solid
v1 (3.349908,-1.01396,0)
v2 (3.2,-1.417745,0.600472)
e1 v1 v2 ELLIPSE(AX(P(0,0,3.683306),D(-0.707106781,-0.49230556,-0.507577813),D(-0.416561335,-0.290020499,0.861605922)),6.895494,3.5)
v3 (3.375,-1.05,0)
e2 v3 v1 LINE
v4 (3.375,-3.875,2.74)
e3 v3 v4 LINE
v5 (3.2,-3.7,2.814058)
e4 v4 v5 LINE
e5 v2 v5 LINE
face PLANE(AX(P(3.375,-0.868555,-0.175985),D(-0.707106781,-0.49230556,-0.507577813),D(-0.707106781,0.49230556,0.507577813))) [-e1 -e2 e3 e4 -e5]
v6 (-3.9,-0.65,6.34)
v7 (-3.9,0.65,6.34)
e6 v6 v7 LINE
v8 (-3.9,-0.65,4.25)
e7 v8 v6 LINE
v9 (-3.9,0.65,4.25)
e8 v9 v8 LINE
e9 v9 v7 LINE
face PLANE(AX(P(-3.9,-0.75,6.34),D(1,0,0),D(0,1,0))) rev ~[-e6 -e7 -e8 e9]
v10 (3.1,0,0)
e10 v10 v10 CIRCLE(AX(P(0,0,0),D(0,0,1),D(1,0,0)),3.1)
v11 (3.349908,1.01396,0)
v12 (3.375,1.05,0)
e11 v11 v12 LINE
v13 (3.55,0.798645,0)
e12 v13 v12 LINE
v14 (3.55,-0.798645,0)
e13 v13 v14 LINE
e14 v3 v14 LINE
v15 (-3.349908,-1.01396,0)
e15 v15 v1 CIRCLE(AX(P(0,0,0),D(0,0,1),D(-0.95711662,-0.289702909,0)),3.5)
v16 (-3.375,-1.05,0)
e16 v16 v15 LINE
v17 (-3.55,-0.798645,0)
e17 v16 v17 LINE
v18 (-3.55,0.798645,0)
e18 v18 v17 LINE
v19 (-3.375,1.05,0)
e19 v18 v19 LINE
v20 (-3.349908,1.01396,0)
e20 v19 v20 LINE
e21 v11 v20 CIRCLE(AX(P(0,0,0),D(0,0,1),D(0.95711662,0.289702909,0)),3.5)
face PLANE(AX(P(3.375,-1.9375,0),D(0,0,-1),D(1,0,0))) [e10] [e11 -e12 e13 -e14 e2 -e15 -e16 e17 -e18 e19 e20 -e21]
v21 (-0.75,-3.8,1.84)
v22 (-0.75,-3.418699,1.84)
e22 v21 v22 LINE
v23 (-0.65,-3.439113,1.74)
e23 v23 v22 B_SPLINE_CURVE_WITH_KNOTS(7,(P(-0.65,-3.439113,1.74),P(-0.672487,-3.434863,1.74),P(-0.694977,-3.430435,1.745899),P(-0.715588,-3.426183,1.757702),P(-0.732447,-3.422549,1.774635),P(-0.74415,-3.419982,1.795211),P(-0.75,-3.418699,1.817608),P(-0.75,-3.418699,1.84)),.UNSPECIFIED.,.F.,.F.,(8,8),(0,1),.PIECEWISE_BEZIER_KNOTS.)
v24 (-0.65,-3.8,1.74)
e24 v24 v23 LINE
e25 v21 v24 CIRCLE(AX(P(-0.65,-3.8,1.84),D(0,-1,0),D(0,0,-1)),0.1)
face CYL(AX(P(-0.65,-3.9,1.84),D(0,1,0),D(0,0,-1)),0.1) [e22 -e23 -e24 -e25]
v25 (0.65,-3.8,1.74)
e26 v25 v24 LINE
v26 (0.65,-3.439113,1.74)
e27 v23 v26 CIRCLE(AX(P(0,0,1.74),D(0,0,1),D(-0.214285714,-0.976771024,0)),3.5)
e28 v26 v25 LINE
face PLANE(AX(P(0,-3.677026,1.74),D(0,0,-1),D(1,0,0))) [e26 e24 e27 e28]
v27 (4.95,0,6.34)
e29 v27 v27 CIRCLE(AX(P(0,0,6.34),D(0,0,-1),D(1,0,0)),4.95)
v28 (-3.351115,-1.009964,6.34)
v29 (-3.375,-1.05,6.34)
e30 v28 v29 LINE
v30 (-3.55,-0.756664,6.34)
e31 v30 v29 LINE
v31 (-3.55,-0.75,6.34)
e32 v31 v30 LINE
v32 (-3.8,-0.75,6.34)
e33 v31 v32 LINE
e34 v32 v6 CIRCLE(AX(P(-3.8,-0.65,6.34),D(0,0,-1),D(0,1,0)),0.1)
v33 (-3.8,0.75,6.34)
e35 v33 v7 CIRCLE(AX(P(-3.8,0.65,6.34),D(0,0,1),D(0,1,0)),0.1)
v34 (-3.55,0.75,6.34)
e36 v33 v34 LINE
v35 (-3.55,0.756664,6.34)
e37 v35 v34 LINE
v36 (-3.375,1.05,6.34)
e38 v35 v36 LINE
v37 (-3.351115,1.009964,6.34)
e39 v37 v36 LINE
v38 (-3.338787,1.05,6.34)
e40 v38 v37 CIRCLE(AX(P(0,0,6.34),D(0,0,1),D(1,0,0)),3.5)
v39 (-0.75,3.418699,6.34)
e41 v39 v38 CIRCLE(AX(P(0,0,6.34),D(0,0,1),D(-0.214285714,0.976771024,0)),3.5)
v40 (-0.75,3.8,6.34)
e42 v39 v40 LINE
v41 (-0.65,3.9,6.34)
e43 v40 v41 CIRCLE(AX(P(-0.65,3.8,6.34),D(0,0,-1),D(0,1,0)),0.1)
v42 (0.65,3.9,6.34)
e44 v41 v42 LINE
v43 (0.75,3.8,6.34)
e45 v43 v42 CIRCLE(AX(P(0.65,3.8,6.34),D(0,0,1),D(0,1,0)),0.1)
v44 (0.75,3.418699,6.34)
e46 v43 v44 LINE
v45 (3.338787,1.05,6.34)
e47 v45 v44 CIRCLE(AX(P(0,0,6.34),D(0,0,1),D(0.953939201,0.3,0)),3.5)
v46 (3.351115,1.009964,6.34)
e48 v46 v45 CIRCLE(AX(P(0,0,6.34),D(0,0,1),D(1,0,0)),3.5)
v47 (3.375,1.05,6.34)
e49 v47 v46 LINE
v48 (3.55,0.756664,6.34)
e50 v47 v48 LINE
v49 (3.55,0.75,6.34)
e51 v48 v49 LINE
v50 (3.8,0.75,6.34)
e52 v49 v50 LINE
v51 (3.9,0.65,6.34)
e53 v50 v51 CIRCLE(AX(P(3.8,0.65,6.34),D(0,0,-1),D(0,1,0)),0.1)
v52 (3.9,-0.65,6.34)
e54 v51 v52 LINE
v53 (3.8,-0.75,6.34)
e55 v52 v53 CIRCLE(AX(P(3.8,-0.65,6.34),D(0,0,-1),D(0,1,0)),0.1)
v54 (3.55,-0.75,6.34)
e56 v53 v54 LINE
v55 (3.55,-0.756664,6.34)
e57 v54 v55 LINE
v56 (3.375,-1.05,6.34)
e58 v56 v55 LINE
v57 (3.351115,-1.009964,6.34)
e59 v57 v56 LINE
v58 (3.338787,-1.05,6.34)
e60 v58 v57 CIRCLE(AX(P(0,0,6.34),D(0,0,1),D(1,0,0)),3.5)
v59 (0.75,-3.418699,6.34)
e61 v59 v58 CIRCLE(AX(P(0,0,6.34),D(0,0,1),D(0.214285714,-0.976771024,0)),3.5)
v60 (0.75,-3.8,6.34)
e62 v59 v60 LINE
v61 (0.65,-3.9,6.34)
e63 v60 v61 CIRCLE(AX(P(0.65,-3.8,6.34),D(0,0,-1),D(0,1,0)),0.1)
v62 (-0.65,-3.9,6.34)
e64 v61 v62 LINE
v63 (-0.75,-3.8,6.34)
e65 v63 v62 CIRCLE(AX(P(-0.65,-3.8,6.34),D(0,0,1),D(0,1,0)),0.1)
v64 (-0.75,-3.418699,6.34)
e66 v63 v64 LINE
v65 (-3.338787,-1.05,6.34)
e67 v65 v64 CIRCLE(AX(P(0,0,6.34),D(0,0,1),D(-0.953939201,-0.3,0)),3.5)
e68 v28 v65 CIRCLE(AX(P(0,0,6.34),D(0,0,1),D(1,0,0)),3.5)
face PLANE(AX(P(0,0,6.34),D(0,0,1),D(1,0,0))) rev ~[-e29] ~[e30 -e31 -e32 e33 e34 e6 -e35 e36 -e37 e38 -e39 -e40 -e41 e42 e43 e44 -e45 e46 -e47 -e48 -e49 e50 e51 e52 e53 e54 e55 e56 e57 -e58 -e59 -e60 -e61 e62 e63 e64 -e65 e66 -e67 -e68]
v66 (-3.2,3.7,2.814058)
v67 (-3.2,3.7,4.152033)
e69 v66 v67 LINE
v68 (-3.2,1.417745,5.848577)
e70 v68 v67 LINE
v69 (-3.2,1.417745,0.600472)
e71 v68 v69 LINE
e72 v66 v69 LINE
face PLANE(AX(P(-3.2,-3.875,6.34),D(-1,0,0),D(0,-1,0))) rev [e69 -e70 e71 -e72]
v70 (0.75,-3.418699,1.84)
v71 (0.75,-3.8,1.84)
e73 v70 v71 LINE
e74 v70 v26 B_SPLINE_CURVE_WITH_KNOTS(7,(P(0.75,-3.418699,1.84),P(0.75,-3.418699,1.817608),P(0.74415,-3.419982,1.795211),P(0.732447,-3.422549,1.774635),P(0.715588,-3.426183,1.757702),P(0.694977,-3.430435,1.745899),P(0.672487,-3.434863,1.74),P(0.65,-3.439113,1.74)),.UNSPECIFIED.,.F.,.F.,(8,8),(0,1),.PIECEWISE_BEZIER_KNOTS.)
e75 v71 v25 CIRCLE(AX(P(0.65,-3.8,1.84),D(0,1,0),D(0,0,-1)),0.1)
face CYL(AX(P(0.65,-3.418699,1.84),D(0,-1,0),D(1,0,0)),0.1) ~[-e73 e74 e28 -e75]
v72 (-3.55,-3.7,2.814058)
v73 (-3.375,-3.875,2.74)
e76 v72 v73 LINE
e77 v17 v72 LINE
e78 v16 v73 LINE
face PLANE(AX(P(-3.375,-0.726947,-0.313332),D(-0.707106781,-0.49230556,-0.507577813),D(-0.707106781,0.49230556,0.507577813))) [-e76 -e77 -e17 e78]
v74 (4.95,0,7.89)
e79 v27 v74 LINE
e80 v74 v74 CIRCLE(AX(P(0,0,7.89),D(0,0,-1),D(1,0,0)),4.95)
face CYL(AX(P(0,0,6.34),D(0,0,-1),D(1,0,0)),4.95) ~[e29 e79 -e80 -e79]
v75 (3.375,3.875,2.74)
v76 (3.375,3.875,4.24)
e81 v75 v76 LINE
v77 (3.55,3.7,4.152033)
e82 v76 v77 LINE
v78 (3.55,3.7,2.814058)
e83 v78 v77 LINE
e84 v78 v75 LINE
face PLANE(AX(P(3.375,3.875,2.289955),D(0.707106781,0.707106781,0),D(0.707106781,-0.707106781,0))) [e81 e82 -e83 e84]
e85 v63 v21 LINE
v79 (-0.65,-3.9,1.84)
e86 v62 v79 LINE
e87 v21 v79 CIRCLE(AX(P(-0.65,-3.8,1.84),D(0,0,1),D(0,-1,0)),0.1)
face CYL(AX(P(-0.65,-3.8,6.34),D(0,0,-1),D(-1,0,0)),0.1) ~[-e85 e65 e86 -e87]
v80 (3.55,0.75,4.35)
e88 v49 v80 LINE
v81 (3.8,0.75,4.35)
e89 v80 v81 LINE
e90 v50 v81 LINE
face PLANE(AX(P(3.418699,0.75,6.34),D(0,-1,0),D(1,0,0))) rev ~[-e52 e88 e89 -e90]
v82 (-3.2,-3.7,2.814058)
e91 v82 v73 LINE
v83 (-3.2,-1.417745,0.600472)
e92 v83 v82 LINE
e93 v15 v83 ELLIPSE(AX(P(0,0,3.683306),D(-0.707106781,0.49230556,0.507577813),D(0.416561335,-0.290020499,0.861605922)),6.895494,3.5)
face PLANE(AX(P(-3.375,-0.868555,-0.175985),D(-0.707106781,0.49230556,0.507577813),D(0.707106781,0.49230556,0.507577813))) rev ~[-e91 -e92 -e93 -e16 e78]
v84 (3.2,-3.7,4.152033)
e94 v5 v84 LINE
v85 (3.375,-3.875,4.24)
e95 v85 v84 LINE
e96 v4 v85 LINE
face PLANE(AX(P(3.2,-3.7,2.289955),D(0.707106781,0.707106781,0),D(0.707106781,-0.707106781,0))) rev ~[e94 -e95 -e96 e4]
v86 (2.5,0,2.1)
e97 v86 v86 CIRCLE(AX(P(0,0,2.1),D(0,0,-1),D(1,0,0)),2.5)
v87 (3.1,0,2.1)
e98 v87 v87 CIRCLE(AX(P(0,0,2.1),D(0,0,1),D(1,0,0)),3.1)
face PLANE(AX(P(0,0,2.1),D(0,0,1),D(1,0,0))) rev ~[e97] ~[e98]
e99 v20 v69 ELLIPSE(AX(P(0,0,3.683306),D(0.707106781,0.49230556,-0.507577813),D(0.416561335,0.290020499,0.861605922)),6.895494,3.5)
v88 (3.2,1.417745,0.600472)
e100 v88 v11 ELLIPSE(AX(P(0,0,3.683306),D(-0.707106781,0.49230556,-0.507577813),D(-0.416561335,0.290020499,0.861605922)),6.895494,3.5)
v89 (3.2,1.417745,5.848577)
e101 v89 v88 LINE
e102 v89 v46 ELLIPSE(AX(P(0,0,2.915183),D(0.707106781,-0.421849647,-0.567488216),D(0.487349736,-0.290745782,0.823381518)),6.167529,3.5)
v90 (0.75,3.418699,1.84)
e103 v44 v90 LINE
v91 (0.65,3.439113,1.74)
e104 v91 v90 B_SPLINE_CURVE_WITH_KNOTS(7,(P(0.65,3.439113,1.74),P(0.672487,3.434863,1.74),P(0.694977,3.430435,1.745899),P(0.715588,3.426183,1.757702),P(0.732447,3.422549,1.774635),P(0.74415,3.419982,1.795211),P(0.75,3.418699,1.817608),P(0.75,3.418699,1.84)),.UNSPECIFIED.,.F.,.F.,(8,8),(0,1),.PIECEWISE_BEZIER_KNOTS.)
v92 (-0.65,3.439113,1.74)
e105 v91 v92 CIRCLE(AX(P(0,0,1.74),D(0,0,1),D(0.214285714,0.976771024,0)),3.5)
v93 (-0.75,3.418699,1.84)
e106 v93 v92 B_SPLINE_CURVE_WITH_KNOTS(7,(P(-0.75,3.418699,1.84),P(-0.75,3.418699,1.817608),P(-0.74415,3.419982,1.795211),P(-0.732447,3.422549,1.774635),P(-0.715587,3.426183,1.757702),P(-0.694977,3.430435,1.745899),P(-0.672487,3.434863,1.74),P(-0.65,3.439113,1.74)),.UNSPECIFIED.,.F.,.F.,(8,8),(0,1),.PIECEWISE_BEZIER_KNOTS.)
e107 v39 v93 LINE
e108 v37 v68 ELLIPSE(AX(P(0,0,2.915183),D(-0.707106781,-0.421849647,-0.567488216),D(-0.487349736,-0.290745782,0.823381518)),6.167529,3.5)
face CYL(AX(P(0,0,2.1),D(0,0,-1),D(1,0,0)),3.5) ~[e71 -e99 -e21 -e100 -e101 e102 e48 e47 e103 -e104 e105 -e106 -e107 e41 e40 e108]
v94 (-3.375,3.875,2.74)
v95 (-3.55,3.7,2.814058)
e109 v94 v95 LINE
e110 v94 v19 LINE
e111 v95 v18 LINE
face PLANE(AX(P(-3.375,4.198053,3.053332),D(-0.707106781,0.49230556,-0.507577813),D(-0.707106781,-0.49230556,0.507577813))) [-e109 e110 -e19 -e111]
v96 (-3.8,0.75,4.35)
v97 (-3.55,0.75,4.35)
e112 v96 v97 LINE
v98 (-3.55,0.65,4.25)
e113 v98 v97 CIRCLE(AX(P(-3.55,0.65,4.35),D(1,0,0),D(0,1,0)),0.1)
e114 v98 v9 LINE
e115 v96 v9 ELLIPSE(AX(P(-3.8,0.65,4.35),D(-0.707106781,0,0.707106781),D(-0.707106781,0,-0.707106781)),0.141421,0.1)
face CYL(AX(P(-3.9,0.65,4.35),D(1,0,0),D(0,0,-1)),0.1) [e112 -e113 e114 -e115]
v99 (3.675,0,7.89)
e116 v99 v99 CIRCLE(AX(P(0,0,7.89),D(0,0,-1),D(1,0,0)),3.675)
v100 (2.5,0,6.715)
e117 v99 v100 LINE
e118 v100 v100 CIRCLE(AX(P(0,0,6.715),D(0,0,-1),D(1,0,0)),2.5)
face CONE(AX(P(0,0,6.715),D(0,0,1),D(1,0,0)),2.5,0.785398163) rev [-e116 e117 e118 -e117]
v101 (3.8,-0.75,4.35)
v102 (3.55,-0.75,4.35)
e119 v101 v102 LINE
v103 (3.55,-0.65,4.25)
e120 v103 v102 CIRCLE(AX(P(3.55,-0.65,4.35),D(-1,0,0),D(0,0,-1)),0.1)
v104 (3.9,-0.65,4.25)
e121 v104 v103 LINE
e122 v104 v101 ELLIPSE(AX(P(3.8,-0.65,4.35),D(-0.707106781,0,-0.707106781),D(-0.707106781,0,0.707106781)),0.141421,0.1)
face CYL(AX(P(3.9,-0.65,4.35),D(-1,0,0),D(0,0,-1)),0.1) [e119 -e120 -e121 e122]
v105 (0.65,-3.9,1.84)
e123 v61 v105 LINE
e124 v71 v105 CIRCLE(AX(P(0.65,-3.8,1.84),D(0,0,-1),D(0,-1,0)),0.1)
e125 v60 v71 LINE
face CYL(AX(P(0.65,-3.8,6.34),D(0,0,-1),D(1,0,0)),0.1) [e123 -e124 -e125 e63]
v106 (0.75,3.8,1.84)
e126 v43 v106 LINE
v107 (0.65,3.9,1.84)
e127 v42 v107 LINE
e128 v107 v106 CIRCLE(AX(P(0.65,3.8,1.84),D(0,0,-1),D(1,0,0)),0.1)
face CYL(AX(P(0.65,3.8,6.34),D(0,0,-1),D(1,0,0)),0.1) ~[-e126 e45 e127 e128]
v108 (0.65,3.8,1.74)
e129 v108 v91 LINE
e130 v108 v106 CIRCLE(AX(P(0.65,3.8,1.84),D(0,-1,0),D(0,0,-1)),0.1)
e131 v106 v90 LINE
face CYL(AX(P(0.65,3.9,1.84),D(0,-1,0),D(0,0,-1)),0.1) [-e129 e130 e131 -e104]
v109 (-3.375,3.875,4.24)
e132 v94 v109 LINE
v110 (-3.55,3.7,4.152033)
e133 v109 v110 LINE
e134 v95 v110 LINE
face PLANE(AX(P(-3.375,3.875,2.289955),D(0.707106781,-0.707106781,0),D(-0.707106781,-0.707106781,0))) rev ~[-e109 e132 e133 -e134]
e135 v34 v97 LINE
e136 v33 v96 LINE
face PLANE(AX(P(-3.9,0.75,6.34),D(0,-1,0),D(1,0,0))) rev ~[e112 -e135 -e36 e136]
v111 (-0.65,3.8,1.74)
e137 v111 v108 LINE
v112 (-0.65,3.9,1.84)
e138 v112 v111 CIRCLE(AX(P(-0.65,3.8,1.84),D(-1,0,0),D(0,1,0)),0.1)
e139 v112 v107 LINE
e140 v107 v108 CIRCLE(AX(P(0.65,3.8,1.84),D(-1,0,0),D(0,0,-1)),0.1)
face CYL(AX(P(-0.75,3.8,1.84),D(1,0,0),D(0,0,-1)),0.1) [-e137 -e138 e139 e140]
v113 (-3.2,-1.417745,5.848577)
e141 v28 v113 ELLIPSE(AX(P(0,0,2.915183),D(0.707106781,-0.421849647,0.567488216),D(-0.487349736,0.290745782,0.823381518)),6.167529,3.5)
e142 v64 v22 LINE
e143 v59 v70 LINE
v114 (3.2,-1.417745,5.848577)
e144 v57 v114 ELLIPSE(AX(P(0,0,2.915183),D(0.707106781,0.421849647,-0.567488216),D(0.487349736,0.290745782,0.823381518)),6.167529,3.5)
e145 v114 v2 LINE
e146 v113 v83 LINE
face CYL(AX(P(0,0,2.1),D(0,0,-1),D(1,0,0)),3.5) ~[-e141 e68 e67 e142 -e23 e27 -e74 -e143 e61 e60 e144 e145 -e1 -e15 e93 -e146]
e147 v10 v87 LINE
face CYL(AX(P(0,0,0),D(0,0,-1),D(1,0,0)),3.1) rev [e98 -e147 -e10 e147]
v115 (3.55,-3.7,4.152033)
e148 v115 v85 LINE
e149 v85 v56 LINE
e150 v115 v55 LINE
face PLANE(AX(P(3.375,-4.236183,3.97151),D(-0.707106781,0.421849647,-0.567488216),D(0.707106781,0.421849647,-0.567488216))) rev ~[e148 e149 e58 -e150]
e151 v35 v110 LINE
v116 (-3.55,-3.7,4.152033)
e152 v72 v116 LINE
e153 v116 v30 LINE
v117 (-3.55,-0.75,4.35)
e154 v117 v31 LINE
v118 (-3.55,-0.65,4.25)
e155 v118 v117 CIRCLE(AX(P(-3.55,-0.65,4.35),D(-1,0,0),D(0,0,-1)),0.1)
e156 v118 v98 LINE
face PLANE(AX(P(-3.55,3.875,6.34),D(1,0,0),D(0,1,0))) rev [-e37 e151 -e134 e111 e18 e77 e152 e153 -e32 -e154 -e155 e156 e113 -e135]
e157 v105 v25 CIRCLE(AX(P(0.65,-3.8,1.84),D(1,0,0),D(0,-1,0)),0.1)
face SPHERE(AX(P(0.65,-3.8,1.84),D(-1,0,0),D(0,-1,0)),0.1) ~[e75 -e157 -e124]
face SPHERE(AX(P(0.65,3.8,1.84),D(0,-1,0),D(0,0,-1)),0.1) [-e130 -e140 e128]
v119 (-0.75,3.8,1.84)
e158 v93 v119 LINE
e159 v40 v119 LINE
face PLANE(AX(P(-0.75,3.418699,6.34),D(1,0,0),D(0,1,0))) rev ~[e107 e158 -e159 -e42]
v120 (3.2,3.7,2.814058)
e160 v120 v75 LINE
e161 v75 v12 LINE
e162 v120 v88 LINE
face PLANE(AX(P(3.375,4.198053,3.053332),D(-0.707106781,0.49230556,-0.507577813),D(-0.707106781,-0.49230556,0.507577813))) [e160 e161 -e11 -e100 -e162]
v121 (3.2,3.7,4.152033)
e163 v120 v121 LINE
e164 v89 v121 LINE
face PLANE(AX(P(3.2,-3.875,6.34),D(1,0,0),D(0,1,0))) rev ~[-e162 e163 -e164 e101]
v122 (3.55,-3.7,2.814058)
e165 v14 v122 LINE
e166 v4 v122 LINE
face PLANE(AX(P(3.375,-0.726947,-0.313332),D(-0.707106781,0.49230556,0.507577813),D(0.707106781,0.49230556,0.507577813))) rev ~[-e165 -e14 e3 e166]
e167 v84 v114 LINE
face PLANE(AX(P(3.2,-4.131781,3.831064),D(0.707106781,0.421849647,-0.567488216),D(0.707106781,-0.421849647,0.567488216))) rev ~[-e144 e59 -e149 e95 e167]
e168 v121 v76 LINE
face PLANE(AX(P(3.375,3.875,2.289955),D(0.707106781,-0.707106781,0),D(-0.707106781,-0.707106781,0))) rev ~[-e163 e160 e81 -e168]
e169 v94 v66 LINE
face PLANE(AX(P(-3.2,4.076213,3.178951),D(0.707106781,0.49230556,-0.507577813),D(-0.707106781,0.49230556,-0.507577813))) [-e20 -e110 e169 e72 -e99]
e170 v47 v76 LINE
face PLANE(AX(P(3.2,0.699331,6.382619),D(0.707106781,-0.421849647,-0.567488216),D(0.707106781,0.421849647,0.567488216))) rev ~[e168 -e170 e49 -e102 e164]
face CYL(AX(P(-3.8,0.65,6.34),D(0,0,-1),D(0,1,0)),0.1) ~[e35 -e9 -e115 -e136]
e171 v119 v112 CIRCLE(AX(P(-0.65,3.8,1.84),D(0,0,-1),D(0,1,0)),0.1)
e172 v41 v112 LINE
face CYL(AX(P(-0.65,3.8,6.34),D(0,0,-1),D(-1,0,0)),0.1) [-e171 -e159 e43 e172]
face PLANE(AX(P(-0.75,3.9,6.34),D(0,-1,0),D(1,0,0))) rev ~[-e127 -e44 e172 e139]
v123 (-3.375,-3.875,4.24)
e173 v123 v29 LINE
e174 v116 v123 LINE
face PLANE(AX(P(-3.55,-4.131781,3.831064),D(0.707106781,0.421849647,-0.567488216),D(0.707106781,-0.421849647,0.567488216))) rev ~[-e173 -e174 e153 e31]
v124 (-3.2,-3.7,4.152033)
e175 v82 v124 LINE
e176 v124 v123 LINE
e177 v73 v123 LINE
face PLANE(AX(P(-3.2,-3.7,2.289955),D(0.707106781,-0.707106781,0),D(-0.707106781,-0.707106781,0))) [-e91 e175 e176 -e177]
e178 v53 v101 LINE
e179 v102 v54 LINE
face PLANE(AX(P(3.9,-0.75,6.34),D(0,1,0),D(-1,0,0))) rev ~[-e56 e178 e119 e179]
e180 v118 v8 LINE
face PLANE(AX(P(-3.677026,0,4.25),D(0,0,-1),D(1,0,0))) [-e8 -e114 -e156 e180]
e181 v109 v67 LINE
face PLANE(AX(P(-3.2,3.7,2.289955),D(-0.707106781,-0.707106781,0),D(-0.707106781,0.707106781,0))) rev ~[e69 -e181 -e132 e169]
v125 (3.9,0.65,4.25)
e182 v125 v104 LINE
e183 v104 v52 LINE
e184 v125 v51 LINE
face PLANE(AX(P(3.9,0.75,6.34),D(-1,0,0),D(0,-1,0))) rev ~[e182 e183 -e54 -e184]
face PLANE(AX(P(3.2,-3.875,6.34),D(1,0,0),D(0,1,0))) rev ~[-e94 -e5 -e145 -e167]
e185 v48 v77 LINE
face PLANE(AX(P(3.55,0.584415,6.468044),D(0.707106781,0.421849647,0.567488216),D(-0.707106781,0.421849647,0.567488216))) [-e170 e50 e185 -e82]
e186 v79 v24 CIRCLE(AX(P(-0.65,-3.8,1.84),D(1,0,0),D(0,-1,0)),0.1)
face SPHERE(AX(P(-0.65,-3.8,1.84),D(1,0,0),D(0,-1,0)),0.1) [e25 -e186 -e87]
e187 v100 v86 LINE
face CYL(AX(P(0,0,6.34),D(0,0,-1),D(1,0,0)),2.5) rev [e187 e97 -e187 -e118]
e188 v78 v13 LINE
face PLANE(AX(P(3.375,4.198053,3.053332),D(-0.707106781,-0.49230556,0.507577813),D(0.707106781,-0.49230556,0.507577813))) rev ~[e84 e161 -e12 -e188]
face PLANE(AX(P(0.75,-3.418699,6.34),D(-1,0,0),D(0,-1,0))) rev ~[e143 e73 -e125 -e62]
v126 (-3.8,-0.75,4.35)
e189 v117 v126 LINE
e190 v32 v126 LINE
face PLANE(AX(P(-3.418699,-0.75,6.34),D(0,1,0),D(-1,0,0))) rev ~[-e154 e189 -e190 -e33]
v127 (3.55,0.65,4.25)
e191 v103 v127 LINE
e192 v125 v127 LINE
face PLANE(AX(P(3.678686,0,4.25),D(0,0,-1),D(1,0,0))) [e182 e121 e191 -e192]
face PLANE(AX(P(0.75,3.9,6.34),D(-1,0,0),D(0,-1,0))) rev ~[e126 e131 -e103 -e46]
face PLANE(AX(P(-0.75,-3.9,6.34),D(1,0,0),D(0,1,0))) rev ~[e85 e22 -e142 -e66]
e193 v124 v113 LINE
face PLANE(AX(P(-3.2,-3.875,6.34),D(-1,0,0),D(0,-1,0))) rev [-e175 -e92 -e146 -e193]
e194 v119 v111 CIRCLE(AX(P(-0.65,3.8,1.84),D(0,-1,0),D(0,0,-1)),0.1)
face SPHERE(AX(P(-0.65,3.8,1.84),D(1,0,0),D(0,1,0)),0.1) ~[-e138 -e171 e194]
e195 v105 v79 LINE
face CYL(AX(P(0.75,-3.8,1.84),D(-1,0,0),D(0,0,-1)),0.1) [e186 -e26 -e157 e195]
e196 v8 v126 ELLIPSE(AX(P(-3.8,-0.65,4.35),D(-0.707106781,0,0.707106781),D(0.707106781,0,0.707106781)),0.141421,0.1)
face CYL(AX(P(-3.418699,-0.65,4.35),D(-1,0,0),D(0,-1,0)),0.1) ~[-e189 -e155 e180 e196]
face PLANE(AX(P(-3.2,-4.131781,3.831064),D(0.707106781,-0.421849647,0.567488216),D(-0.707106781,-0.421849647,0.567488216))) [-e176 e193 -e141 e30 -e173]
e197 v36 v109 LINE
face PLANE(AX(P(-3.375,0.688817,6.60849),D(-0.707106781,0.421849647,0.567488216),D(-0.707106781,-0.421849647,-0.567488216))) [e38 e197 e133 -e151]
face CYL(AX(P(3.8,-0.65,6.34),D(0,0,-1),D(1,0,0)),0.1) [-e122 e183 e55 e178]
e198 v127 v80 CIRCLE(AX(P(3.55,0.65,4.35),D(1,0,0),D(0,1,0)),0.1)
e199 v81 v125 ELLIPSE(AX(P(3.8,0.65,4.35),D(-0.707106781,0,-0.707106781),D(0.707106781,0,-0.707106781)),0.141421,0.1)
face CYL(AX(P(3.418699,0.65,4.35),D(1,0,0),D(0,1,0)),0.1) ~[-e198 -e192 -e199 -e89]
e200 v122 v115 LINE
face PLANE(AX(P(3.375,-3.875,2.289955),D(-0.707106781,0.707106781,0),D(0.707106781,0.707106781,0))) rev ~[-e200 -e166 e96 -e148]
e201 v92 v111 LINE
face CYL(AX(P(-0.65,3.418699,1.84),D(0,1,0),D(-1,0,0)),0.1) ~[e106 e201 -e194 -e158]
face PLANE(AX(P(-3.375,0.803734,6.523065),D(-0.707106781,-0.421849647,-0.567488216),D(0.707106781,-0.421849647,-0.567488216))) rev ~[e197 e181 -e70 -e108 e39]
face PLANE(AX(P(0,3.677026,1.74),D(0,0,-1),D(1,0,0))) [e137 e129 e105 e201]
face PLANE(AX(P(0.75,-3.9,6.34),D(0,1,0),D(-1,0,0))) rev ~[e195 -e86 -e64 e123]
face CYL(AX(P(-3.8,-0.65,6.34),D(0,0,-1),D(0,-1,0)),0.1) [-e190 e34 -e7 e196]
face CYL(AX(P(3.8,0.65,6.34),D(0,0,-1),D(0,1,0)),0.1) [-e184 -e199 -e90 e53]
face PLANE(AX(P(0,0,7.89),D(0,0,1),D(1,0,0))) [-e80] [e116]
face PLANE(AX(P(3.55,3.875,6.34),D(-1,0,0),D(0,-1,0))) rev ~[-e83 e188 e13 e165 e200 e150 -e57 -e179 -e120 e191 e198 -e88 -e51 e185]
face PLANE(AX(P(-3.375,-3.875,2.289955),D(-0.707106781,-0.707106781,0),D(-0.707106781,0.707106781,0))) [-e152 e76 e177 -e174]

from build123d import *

# Parameters (mm, degrees)
F0_R          = 3.5
F0_R_2        = 3.1
F1_DEPTH      = 2.1
F2_R          = 3.5
F2_R_2        = 3.1
F2_R_3        = 2.5
F3_DEPTH      = 4.24
F4_R          = 4.95
F4_R_2        = 3.5
F4_R_3        = 2.5
F5_DEPTH      = 1.55
F6_SIZE       = 1.175
F8_DEPTH      = 4.6
F9_DEPTH      = 2.09
F10_R         = 0.1
F11_W         = 0.35
F11_H         = 3.875
F12_DEPTH     = 6.34
F14_DEPTH     = 0.38076
F16_T1_DEPTH  = 4.8355972722
F16_T3_DEPTH  = 2.4000890458
F16_T5_DEPTH  = 4.8355972722
F16_T10_DEPTH = 4.4201210059
F16_T15_DEPTH = 4.638323219
F16_S16_R     = 3.5
F16_T17_DEPTH = 4
F16_T21_DEPTH = 4.2769316216
F16_S23_R     = 3.5
F16_T24_DEPTH = 4
F16_T28_DEPTH = 4.638323219
F16_S29_R     = 3.5
F16_T30_DEPTH = 4
F16_T34_DEPTH = 4.4201210059
F16_T39_DEPTH = 4.2769316216
F16_S41_R     = 3.5
F16_T42_DEPTH = 4
F16_T46_DEPTH = 4.2769316216
F16_S48_R     = 3.5
F16_T49_DEPTH = 4
F16_T53_DEPTH = 4.4201210059
F16_T58_DEPTH = 4.638323219
F16_S59_R     = 3.5
F16_T60_DEPTH = 4
F16_T64_DEPTH = 4.4201210059
F16_T69_DEPTH = 4.2769316216
F16_S71_R     = 3.5
F16_T72_DEPTH = 4
F16_T76_DEPTH = 4.638323219
F16_S77_R     = 3.5
F16_T78_DEPTH = 4


# Not quite as in the source:
# - a fillet or chamfer that OpenCascade refuses, or shapes differently, is made with other operations: its cross-section is extruded or revolved along the edge and cut away or added


with BuildPart() as f1:
    # F0 (on Top) → F1 (new body)
    with BuildSketch(Plane.XY):
        Circle(F0_R)
        Circle(F0_R_2, mode=Mode.SUBTRACT)
    extrude(amount=F1_DEPTH)

    # F2 (on face) → F3 (join)
    with BuildSketch(Plane.XY.offset(2.1)):
        Circle(F2_R)
        Circle(F2_R_2, mode=Mode.SUBTRACT)
        Circle(F2_R_2)
        Circle(F2_R_3, mode=Mode.SUBTRACT)
    extrude(amount=F3_DEPTH)

    # F4 (on face) → F5 (join)
    with BuildSketch(Plane.XY.offset(6.34)):
        Circle(F4_R)
        Circle(F4_R_2, mode=Mode.SUBTRACT)
        Circle(F4_R_2)
        Circle(F4_R_3, mode=Mode.SUBTRACT)
    extrude(amount=F5_DEPTH)

    # F6
    f6_edges = [f1.edges().sort_by_distance(p)[0] for p in [
        (-2.5, 0, 7.89),
    ]]
    chamfer(f6_edges, length=F6_SIZE)

    # F7 (on face) → F8 (join)
    with BuildSketch(Plane(origin=(0, 0, 6.34), x_dir=(1, 0, 0), z_dir=(0, 0, -1))):
        with BuildLine():
            Line((-0.75, -3.9), (0, -3.9))
            Line((0, -3.9), (0.75, -3.9))
            Line((0.75, -3.9), (0.75, -3.4186985828))
            ThreePointArc((0.75, -3.4186985828), (0, -3.5), (-0.75, -3.4186985828))
            Line((-0.75, -3.4186985828), (-0.75, -3.9))
        make_face()
        with BuildLine():
            Line((-0.75, 3.9), (-0.75, 3.4186985828))
            ThreePointArc((-0.75, 3.4186985828), (0, 3.5), (0.75, 3.4186985828))
            Line((0.75, 3.4186985828), (0.75, 3.9))
            Line((0.75, 3.9), (0, 3.9))
            Line((0, 3.9), (-0.75, 3.9))
        make_face()
    extrude(amount=F8_DEPTH)

    # F7 (on face) → F9 (join)
    with BuildSketch(Plane(origin=(0, 0, 6.34), x_dir=(1, 0, 0), z_dir=(0, 0, -1))):
        with BuildLine():
            Line((-3.9, -0.75), (-3.4186985828, -0.75))
            ThreePointArc((-3.4186985828, -0.75), (-3.5, 0), (-3.4186985828, 0.75))
            Line((-3.4186985828, 0.75), (-3.9, 0.75))
            Line((-3.9, 0.75), (-3.9, 0))
            Line((-3.9, 0), (-3.9, -0.75))
        make_face()
        with BuildLine():
            ThreePointArc((3.5, 0), (3.4796152833, -0.3771968718), (3.4186985828, -0.75))
            Line((3.4186985828, -0.75), (3.9, -0.75))
            Line((3.9, -0.75), (3.9, 0))
            Line((3.9, 0), (3.9, 0.75))
            Line((3.9, 0.75), (3.4186985828, 0.75))
            ThreePointArc((3.4186985828, 0.75), (3.4796152833, 0.3771968718), (3.5, 0))
        make_face()
    extrude(amount=F9_DEPTH)

    # F10
    f10_edges = [f1.edges().sort_by_distance(p)[0] for p in [
        (0.75, 3.659349, 1.74),
        (0, 3.9, 1.74),
        (0.75, 3.9, 4.04),
        (3.659349, 0.75, 4.25),
        (3.9, 0.75, 5.295),
        (3.659349, -0.75, 4.25),
        (3.9, -0.75, 5.295),
        (0, -3.9, 1.74),
        (0.75, -3.9, 4.04),
        (0.75, -3.659349, 1.74),
        (-0.75, -3.9, 4.04),
        (-0.75, -3.659349, 1.74),
        (-3.9, -0.75, 5.295),
        (-3.9, 0, 4.25),
        (-3.9, 0.75, 5.295),
        (-3.659349, 0.75, 4.25),
        (-3.659349, -0.75, 4.25),
        (-0.75, 3.9, 4.04),
        (-0.75, 3.659349, 1.74),
    ]]
    fillet(f10_edges, radius=F10_R)

    # F11 (on face) → F12 (join)
    with BuildSketch(Plane(origin=(0, 0, 6.34), x_dir=(1, 0, 0), z_dir=(0, 0, -1))):
        with Locations((3.375, 1.9375)):
            Rectangle(F11_W, F11_H)
        with Locations((3.375, -1.9375)):
            Rectangle(F11_W, F11_H)
    extrude(amount=F12_DEPTH)

    # F13 (on face) → F14 (cut)
    with BuildSketch(Plane.YZ.offset(3.55)):
        Polygon((-3.875, 6.34), (-3.875, 4.24), (-1.05, 6.34), (-3.4496376621, 6.34), align=None)
        Polygon((1.05, 6.34), (3.875, 4.24), (3.875, 6.34), (3.4496376621, 6.34), align=None)
        Polygon((3.875, 2.74), (1.05, 0), (3.875, 0), align=None)
        Polygon((-1.05, 0), (-3.875, 2.74), (-3.875, 0), align=None)
    extrude(amount=-F14_DEPTH, mode=Mode.SUBTRACT)

    # F15: F1 across plane


with BuildPart() as f1_1:
    add(f1.part)
    add(f1.part.mirror(Plane.YZ))

    # F16: chamfer of 0.175 on 24 edges, made by hand

    # F16_s2 → F16_t1 (cut)
    with BuildSketch(Plane(origin=(0, 3.6890864967, 3.5780874339), x_dir=(1, 0, 0), z_dir=(0, -0.7178234265, -0.6962251995))):
        Polygon((-3.375, -0.7310364595), (-3.55, -0.5560364595), (-3.55, -0.7310364595), align=None)
        Polygon((3.375, -0.7310364595), (3.55, -0.5560364595), (3.55, -0.7310364595), align=None)
    extrude(amount=F16_T1_DEPTH, mode=Mode.SUBTRACT)

    # F16_s4 → F16_t3 (cut)
    with BuildSketch(Plane.XY.offset(2.2899554771)):
        Polygon((-3.375, 3.875), (-3.55, 3.7), (-3.55, 3.875), align=None)
        Polygon((-3.2, 3.7), (-3.375, 3.875), (-3.2, 3.875), align=None)
        Polygon((-3.375, -3.875), (-3.55, -3.7), (-3.55, -3.875), align=None)
        Polygon((-3.2, -3.7), (-3.375, -3.875), (-3.2, -3.875), align=None)
        Polygon((3.2, -3.7), (3.375, -3.875), (3.2, -3.875), align=None)
        Polygon((3.375, -3.875), (3.55, -3.7), (3.55, -3.875), align=None)
        Polygon((3.375, 3.875), (3.55, 3.7), (3.55, 3.875), align=None)
        Polygon((3.375, 3.875), (3.2, 3.7), (3.2, 3.875), align=None)
    extrude(amount=F16_T3_DEPTH, mode=Mode.SUBTRACT)

    # F16_s6 → F16_t5 (cut)
    with BuildSketch(Plane(origin=(0, -0.2179814937, 0.2114227585), x_dir=(1, 0, 0), z_dir=(0, -0.7178234265, 0.6962251995))):
        Polygon((-3.375, -0.7310364595), (-3.55, -0.5560364595), (-3.55, -0.7310364595), align=None)
        Polygon((3.375, -0.7310364595), (3.55, -0.5560364595), (3.55, -0.7310364595), align=None)
    extrude(amount=F16_T5_DEPTH, mode=Mode.SUBTRACT)


with BuildPart() as f16_tool8:
    # F16_s9 → F16_t10 (new body)
    with BuildSketch(Plane(origin=(0, -2.7204178255, 2.0222574986), x_dir=(1, 0, 0), z_dir=(0, 0.8025495314, -0.5965854924))):
        Polygon((-3.375, -5.7145787959), (-3.55, -5.5395787959), (-3.55, -5.7145787959), align=None)
    extrude(amount=F16_T10_DEPTH)

    split(bisect_by=Plane.XY.offset(6.34), keep=Keep.BOTTOM)


with BuildPart() as f1_2:
    add(f1_1.part)

    # F16_t7: cut F16_tool8
    add(f16_tool8.part, mode=Mode.SUBTRACT)


with BuildPart() as f16_tool13:
    # F16_s14 → F16_t15 (new body)
    with BuildSketch(Plane(origin=(0, 3.6890864967, 3.5780874339), x_dir=(1, 0, 0), z_dir=(0, -0.7178234265, -0.6962251995))):
        Polygon((-3.2, -0.5560364595), (-3.375, -0.7310364595), (-3.2, -0.7310364595), align=None)
    extrude(amount=F16_T15_DEPTH)

    # F16_s16 → F16_t17 (cut, symmetric)
    with BuildSketch(Plane.XY.offset(1.5)):
        Circle(F16_S16_R)
    extrude(amount=F16_T17_DEPTH, both=True, mode=Mode.SUBTRACT)


with BuildPart() as f1_3:
    add(f1_2.part)

    # F16_t12: cut F16_tool13
    add(f16_tool13.part, mode=Mode.SUBTRACT)


with BuildPart() as f16_tool19:
    # F16_s20 → F16_t21 (new body)
    with BuildSketch(Plane(origin=(0, -2.6055012523, 1.9368327893), x_dir=(1, 0, 0), z_dir=(0, 0.8025495314, -0.5965854924))):
        Polygon((-3.375, -5.7145787959), (-3.2, -5.5395787959), (-3.2, -5.7145787959), align=None)
    extrude(amount=F16_T21_DEPTH)

    split(bisect_by=Plane.XY.offset(6.34), keep=Keep.BOTTOM)

    # F16_s23 → F16_t24 (cut, symmetric)
    with BuildSketch(Plane.XY.offset(5.2)):
        Circle(F16_S23_R)
    extrude(amount=F16_T24_DEPTH, both=True, mode=Mode.SUBTRACT)


with BuildPart() as f1_4:
    add(f1_3.part)

    # F16_t18: cut F16_tool19
    add(f16_tool19.part, mode=Mode.SUBTRACT)


with BuildPart() as f16_tool26:
    # F16_s27 → F16_t28 (new body)
    with BuildSketch(Plane(origin=(0, -0.3595894305, 0.3487699255), x_dir=(1, 0, 0), z_dir=(0, -0.7178234265, 0.6962251995))):
        Polygon((-3.375, -0.7310364595), (-3.2, -0.5560364595), (-3.2, -0.7310364595), align=None)
    extrude(amount=F16_T28_DEPTH)

    # F16_s29 → F16_t30 (cut, symmetric)
    with BuildSketch(Plane.XY.offset(1.5)):
        Circle(F16_S29_R)
    extrude(amount=F16_T30_DEPTH, both=True, mode=Mode.SUBTRACT)


with BuildPart() as f1_5:
    add(f1_4.part)

    # F16_t25: cut F16_tool26
    add(f16_tool26.part, mode=Mode.SUBTRACT)


with BuildPart() as f16_tool32:
    # F16_s33 → F16_t34 (new body)
    with BuildSketch(Plane(origin=(0, -0.8269482164, -0.6147225679), x_dir=(1, 0, 0), z_dir=(0, 0.8025495314, 0.5965854924))):
        Polygon((-3.55, -5.5395787959), (-3.375, -5.7145787959), (-3.55, -5.7145787959), align=None)
    extrude(amount=F16_T34_DEPTH)

    split(bisect_by=Plane.XY.offset(6.34), keep=Keep.BOTTOM)


with BuildPart() as f1_6:
    add(f1_5.part)

    # F16_t31: cut F16_tool32
    add(f16_tool32.part, mode=Mode.SUBTRACT)


with BuildPart() as f16_tool37:
    # F16_s38 → F16_t39 (new body)
    with BuildSketch(Plane(origin=(0, -0.8269482164, -0.6147225679), x_dir=(1, 0, 0), z_dir=(0, 0.8025495314, 0.5965854924))):
        Polygon((-3.2, -5.5395787959), (-3.375, -5.7145787959), (-3.2, -5.7145787959), align=None)
    extrude(amount=F16_T39_DEPTH)

    split(bisect_by=Plane.XY.offset(6.34), keep=Keep.BOTTOM)

    # F16_s41 → F16_t42 (cut, symmetric)
    with BuildSketch(Plane.XY.offset(5.2)):
        Circle(F16_S41_R)
    extrude(amount=F16_T42_DEPTH, both=True, mode=Mode.SUBTRACT)


with BuildPart() as f1_7:
    add(f1_6.part)

    # F16_t36: cut F16_tool37
    add(f16_tool37.part, mode=Mode.SUBTRACT)


with BuildPart() as f16_tool44:
    # F16_s45 → F16_t46 (new body)
    with BuildSketch(Plane(origin=(0, -0.8269482164, -0.6147225679), x_dir=(1, 0, 0), z_dir=(0, 0.8025495314, 0.5965854924))):
        Polygon((3.2, -5.5395787959), (3.375, -5.7145787959), (3.2, -5.7145787959), align=None)
    extrude(amount=F16_T46_DEPTH)

    split(bisect_by=Plane.XY.offset(6.34), keep=Keep.BOTTOM)

    # F16_s48 → F16_t49 (cut, symmetric)
    with BuildSketch(Plane.XY.offset(5.2)):
        Circle(F16_S48_R)
    extrude(amount=F16_T49_DEPTH, both=True, mode=Mode.SUBTRACT)


with BuildPart() as f1_8:
    add(f1_7.part)

    # F16_t43: cut F16_tool44
    add(f16_tool44.part, mode=Mode.SUBTRACT)


with BuildPart() as f16_tool51:
    # F16_s52 → F16_t53 (new body)
    with BuildSketch(Plane(origin=(0, -0.8269482164, -0.6147225679), x_dir=(1, 0, 0), z_dir=(0, 0.8025495314, 0.5965854924))):
        Polygon((3.375, -5.7145787959), (3.55, -5.5395787959), (3.55, -5.7145787959), align=None)
    extrude(amount=F16_T53_DEPTH)

    split(bisect_by=Plane.XY.offset(6.34), keep=Keep.BOTTOM)


with BuildPart() as f1_9:
    add(f1_8.part)

    # F16_t50: cut F16_tool51
    add(f16_tool51.part, mode=Mode.SUBTRACT)


with BuildPart() as f16_tool56:
    # F16_s57 → F16_t58 (new body)
    with BuildSketch(Plane(origin=(0, -0.3595894305, 0.3487699255), x_dir=(1, 0, 0), z_dir=(0, -0.7178234265, 0.6962251995))):
        Polygon((3.375, -0.7310364595), (3.2, -0.5560364595), (3.2, -0.7310364595), align=None)
    extrude(amount=F16_T58_DEPTH)

    # F16_s59 → F16_t60 (cut, symmetric)
    with BuildSketch(Plane.XY.offset(1.5)):
        Circle(F16_S59_R)
    extrude(amount=F16_T60_DEPTH, both=True, mode=Mode.SUBTRACT)


with BuildPart() as f1_10:
    add(f1_9.part)

    # F16_t55: cut F16_tool56
    add(f16_tool56.part, mode=Mode.SUBTRACT)


with BuildPart() as f16_tool62:
    # F16_s63 → F16_t64 (new body)
    with BuildSketch(Plane(origin=(0, -2.7204178255, 2.0222574986), x_dir=(1, 0, 0), z_dir=(0, 0.8025495314, -0.5965854924))):
        Polygon((3.55, -5.5395787959), (3.375, -5.7145787959), (3.55, -5.7145787959), align=None)
    extrude(amount=F16_T64_DEPTH)

    split(bisect_by=Plane.XY.offset(6.34), keep=Keep.BOTTOM)


with BuildPart() as f1_11:
    add(f1_10.part)

    # F16_t61: cut F16_tool62
    add(f16_tool62.part, mode=Mode.SUBTRACT)


with BuildPart() as f16_tool67:
    # F16_s68 → F16_t69 (new body)
    with BuildSketch(Plane(origin=(0, -2.6055012523, 1.9368327893), x_dir=(1, 0, 0), z_dir=(0, 0.8025495314, -0.5965854924))):
        Polygon((3.2, -5.5395787959), (3.375, -5.7145787959), (3.2, -5.7145787959), align=None)
    extrude(amount=F16_T69_DEPTH)

    split(bisect_by=Plane.XY.offset(6.34), keep=Keep.BOTTOM)

    # F16_s71 → F16_t72 (cut, symmetric)
    with BuildSketch(Plane.XY.offset(5.2)):
        Circle(F16_S71_R)
    extrude(amount=F16_T72_DEPTH, both=True, mode=Mode.SUBTRACT)


with BuildPart() as f1_12:
    add(f1_11.part)

    # F16_t66: cut F16_tool67
    add(f16_tool67.part, mode=Mode.SUBTRACT)


with BuildPart() as f16_tool74:
    # F16_s75 → F16_t76 (new body)
    with BuildSketch(Plane(origin=(0, 3.6890864967, 3.5780874339), x_dir=(1, 0, 0), z_dir=(0, -0.7178234265, -0.6962251995))):
        Polygon((3.375, -0.7310364595), (3.2, -0.5560364595), (3.2, -0.7310364595), align=None)
    extrude(amount=F16_T76_DEPTH)

    # F16_s77 → F16_t78 (cut, symmetric)
    with BuildSketch(Plane.XY.offset(1.5)):
        Circle(F16_S77_R)
    extrude(amount=F16_T78_DEPTH, both=True, mode=Mode.SUBTRACT)


with BuildPart() as f1_13:
    add(f1_12.part)

    # F16_t73: cut F16_tool74
    add(f16_tool74.part, mode=Mode.SUBTRACT)


solid = f1_13.part
